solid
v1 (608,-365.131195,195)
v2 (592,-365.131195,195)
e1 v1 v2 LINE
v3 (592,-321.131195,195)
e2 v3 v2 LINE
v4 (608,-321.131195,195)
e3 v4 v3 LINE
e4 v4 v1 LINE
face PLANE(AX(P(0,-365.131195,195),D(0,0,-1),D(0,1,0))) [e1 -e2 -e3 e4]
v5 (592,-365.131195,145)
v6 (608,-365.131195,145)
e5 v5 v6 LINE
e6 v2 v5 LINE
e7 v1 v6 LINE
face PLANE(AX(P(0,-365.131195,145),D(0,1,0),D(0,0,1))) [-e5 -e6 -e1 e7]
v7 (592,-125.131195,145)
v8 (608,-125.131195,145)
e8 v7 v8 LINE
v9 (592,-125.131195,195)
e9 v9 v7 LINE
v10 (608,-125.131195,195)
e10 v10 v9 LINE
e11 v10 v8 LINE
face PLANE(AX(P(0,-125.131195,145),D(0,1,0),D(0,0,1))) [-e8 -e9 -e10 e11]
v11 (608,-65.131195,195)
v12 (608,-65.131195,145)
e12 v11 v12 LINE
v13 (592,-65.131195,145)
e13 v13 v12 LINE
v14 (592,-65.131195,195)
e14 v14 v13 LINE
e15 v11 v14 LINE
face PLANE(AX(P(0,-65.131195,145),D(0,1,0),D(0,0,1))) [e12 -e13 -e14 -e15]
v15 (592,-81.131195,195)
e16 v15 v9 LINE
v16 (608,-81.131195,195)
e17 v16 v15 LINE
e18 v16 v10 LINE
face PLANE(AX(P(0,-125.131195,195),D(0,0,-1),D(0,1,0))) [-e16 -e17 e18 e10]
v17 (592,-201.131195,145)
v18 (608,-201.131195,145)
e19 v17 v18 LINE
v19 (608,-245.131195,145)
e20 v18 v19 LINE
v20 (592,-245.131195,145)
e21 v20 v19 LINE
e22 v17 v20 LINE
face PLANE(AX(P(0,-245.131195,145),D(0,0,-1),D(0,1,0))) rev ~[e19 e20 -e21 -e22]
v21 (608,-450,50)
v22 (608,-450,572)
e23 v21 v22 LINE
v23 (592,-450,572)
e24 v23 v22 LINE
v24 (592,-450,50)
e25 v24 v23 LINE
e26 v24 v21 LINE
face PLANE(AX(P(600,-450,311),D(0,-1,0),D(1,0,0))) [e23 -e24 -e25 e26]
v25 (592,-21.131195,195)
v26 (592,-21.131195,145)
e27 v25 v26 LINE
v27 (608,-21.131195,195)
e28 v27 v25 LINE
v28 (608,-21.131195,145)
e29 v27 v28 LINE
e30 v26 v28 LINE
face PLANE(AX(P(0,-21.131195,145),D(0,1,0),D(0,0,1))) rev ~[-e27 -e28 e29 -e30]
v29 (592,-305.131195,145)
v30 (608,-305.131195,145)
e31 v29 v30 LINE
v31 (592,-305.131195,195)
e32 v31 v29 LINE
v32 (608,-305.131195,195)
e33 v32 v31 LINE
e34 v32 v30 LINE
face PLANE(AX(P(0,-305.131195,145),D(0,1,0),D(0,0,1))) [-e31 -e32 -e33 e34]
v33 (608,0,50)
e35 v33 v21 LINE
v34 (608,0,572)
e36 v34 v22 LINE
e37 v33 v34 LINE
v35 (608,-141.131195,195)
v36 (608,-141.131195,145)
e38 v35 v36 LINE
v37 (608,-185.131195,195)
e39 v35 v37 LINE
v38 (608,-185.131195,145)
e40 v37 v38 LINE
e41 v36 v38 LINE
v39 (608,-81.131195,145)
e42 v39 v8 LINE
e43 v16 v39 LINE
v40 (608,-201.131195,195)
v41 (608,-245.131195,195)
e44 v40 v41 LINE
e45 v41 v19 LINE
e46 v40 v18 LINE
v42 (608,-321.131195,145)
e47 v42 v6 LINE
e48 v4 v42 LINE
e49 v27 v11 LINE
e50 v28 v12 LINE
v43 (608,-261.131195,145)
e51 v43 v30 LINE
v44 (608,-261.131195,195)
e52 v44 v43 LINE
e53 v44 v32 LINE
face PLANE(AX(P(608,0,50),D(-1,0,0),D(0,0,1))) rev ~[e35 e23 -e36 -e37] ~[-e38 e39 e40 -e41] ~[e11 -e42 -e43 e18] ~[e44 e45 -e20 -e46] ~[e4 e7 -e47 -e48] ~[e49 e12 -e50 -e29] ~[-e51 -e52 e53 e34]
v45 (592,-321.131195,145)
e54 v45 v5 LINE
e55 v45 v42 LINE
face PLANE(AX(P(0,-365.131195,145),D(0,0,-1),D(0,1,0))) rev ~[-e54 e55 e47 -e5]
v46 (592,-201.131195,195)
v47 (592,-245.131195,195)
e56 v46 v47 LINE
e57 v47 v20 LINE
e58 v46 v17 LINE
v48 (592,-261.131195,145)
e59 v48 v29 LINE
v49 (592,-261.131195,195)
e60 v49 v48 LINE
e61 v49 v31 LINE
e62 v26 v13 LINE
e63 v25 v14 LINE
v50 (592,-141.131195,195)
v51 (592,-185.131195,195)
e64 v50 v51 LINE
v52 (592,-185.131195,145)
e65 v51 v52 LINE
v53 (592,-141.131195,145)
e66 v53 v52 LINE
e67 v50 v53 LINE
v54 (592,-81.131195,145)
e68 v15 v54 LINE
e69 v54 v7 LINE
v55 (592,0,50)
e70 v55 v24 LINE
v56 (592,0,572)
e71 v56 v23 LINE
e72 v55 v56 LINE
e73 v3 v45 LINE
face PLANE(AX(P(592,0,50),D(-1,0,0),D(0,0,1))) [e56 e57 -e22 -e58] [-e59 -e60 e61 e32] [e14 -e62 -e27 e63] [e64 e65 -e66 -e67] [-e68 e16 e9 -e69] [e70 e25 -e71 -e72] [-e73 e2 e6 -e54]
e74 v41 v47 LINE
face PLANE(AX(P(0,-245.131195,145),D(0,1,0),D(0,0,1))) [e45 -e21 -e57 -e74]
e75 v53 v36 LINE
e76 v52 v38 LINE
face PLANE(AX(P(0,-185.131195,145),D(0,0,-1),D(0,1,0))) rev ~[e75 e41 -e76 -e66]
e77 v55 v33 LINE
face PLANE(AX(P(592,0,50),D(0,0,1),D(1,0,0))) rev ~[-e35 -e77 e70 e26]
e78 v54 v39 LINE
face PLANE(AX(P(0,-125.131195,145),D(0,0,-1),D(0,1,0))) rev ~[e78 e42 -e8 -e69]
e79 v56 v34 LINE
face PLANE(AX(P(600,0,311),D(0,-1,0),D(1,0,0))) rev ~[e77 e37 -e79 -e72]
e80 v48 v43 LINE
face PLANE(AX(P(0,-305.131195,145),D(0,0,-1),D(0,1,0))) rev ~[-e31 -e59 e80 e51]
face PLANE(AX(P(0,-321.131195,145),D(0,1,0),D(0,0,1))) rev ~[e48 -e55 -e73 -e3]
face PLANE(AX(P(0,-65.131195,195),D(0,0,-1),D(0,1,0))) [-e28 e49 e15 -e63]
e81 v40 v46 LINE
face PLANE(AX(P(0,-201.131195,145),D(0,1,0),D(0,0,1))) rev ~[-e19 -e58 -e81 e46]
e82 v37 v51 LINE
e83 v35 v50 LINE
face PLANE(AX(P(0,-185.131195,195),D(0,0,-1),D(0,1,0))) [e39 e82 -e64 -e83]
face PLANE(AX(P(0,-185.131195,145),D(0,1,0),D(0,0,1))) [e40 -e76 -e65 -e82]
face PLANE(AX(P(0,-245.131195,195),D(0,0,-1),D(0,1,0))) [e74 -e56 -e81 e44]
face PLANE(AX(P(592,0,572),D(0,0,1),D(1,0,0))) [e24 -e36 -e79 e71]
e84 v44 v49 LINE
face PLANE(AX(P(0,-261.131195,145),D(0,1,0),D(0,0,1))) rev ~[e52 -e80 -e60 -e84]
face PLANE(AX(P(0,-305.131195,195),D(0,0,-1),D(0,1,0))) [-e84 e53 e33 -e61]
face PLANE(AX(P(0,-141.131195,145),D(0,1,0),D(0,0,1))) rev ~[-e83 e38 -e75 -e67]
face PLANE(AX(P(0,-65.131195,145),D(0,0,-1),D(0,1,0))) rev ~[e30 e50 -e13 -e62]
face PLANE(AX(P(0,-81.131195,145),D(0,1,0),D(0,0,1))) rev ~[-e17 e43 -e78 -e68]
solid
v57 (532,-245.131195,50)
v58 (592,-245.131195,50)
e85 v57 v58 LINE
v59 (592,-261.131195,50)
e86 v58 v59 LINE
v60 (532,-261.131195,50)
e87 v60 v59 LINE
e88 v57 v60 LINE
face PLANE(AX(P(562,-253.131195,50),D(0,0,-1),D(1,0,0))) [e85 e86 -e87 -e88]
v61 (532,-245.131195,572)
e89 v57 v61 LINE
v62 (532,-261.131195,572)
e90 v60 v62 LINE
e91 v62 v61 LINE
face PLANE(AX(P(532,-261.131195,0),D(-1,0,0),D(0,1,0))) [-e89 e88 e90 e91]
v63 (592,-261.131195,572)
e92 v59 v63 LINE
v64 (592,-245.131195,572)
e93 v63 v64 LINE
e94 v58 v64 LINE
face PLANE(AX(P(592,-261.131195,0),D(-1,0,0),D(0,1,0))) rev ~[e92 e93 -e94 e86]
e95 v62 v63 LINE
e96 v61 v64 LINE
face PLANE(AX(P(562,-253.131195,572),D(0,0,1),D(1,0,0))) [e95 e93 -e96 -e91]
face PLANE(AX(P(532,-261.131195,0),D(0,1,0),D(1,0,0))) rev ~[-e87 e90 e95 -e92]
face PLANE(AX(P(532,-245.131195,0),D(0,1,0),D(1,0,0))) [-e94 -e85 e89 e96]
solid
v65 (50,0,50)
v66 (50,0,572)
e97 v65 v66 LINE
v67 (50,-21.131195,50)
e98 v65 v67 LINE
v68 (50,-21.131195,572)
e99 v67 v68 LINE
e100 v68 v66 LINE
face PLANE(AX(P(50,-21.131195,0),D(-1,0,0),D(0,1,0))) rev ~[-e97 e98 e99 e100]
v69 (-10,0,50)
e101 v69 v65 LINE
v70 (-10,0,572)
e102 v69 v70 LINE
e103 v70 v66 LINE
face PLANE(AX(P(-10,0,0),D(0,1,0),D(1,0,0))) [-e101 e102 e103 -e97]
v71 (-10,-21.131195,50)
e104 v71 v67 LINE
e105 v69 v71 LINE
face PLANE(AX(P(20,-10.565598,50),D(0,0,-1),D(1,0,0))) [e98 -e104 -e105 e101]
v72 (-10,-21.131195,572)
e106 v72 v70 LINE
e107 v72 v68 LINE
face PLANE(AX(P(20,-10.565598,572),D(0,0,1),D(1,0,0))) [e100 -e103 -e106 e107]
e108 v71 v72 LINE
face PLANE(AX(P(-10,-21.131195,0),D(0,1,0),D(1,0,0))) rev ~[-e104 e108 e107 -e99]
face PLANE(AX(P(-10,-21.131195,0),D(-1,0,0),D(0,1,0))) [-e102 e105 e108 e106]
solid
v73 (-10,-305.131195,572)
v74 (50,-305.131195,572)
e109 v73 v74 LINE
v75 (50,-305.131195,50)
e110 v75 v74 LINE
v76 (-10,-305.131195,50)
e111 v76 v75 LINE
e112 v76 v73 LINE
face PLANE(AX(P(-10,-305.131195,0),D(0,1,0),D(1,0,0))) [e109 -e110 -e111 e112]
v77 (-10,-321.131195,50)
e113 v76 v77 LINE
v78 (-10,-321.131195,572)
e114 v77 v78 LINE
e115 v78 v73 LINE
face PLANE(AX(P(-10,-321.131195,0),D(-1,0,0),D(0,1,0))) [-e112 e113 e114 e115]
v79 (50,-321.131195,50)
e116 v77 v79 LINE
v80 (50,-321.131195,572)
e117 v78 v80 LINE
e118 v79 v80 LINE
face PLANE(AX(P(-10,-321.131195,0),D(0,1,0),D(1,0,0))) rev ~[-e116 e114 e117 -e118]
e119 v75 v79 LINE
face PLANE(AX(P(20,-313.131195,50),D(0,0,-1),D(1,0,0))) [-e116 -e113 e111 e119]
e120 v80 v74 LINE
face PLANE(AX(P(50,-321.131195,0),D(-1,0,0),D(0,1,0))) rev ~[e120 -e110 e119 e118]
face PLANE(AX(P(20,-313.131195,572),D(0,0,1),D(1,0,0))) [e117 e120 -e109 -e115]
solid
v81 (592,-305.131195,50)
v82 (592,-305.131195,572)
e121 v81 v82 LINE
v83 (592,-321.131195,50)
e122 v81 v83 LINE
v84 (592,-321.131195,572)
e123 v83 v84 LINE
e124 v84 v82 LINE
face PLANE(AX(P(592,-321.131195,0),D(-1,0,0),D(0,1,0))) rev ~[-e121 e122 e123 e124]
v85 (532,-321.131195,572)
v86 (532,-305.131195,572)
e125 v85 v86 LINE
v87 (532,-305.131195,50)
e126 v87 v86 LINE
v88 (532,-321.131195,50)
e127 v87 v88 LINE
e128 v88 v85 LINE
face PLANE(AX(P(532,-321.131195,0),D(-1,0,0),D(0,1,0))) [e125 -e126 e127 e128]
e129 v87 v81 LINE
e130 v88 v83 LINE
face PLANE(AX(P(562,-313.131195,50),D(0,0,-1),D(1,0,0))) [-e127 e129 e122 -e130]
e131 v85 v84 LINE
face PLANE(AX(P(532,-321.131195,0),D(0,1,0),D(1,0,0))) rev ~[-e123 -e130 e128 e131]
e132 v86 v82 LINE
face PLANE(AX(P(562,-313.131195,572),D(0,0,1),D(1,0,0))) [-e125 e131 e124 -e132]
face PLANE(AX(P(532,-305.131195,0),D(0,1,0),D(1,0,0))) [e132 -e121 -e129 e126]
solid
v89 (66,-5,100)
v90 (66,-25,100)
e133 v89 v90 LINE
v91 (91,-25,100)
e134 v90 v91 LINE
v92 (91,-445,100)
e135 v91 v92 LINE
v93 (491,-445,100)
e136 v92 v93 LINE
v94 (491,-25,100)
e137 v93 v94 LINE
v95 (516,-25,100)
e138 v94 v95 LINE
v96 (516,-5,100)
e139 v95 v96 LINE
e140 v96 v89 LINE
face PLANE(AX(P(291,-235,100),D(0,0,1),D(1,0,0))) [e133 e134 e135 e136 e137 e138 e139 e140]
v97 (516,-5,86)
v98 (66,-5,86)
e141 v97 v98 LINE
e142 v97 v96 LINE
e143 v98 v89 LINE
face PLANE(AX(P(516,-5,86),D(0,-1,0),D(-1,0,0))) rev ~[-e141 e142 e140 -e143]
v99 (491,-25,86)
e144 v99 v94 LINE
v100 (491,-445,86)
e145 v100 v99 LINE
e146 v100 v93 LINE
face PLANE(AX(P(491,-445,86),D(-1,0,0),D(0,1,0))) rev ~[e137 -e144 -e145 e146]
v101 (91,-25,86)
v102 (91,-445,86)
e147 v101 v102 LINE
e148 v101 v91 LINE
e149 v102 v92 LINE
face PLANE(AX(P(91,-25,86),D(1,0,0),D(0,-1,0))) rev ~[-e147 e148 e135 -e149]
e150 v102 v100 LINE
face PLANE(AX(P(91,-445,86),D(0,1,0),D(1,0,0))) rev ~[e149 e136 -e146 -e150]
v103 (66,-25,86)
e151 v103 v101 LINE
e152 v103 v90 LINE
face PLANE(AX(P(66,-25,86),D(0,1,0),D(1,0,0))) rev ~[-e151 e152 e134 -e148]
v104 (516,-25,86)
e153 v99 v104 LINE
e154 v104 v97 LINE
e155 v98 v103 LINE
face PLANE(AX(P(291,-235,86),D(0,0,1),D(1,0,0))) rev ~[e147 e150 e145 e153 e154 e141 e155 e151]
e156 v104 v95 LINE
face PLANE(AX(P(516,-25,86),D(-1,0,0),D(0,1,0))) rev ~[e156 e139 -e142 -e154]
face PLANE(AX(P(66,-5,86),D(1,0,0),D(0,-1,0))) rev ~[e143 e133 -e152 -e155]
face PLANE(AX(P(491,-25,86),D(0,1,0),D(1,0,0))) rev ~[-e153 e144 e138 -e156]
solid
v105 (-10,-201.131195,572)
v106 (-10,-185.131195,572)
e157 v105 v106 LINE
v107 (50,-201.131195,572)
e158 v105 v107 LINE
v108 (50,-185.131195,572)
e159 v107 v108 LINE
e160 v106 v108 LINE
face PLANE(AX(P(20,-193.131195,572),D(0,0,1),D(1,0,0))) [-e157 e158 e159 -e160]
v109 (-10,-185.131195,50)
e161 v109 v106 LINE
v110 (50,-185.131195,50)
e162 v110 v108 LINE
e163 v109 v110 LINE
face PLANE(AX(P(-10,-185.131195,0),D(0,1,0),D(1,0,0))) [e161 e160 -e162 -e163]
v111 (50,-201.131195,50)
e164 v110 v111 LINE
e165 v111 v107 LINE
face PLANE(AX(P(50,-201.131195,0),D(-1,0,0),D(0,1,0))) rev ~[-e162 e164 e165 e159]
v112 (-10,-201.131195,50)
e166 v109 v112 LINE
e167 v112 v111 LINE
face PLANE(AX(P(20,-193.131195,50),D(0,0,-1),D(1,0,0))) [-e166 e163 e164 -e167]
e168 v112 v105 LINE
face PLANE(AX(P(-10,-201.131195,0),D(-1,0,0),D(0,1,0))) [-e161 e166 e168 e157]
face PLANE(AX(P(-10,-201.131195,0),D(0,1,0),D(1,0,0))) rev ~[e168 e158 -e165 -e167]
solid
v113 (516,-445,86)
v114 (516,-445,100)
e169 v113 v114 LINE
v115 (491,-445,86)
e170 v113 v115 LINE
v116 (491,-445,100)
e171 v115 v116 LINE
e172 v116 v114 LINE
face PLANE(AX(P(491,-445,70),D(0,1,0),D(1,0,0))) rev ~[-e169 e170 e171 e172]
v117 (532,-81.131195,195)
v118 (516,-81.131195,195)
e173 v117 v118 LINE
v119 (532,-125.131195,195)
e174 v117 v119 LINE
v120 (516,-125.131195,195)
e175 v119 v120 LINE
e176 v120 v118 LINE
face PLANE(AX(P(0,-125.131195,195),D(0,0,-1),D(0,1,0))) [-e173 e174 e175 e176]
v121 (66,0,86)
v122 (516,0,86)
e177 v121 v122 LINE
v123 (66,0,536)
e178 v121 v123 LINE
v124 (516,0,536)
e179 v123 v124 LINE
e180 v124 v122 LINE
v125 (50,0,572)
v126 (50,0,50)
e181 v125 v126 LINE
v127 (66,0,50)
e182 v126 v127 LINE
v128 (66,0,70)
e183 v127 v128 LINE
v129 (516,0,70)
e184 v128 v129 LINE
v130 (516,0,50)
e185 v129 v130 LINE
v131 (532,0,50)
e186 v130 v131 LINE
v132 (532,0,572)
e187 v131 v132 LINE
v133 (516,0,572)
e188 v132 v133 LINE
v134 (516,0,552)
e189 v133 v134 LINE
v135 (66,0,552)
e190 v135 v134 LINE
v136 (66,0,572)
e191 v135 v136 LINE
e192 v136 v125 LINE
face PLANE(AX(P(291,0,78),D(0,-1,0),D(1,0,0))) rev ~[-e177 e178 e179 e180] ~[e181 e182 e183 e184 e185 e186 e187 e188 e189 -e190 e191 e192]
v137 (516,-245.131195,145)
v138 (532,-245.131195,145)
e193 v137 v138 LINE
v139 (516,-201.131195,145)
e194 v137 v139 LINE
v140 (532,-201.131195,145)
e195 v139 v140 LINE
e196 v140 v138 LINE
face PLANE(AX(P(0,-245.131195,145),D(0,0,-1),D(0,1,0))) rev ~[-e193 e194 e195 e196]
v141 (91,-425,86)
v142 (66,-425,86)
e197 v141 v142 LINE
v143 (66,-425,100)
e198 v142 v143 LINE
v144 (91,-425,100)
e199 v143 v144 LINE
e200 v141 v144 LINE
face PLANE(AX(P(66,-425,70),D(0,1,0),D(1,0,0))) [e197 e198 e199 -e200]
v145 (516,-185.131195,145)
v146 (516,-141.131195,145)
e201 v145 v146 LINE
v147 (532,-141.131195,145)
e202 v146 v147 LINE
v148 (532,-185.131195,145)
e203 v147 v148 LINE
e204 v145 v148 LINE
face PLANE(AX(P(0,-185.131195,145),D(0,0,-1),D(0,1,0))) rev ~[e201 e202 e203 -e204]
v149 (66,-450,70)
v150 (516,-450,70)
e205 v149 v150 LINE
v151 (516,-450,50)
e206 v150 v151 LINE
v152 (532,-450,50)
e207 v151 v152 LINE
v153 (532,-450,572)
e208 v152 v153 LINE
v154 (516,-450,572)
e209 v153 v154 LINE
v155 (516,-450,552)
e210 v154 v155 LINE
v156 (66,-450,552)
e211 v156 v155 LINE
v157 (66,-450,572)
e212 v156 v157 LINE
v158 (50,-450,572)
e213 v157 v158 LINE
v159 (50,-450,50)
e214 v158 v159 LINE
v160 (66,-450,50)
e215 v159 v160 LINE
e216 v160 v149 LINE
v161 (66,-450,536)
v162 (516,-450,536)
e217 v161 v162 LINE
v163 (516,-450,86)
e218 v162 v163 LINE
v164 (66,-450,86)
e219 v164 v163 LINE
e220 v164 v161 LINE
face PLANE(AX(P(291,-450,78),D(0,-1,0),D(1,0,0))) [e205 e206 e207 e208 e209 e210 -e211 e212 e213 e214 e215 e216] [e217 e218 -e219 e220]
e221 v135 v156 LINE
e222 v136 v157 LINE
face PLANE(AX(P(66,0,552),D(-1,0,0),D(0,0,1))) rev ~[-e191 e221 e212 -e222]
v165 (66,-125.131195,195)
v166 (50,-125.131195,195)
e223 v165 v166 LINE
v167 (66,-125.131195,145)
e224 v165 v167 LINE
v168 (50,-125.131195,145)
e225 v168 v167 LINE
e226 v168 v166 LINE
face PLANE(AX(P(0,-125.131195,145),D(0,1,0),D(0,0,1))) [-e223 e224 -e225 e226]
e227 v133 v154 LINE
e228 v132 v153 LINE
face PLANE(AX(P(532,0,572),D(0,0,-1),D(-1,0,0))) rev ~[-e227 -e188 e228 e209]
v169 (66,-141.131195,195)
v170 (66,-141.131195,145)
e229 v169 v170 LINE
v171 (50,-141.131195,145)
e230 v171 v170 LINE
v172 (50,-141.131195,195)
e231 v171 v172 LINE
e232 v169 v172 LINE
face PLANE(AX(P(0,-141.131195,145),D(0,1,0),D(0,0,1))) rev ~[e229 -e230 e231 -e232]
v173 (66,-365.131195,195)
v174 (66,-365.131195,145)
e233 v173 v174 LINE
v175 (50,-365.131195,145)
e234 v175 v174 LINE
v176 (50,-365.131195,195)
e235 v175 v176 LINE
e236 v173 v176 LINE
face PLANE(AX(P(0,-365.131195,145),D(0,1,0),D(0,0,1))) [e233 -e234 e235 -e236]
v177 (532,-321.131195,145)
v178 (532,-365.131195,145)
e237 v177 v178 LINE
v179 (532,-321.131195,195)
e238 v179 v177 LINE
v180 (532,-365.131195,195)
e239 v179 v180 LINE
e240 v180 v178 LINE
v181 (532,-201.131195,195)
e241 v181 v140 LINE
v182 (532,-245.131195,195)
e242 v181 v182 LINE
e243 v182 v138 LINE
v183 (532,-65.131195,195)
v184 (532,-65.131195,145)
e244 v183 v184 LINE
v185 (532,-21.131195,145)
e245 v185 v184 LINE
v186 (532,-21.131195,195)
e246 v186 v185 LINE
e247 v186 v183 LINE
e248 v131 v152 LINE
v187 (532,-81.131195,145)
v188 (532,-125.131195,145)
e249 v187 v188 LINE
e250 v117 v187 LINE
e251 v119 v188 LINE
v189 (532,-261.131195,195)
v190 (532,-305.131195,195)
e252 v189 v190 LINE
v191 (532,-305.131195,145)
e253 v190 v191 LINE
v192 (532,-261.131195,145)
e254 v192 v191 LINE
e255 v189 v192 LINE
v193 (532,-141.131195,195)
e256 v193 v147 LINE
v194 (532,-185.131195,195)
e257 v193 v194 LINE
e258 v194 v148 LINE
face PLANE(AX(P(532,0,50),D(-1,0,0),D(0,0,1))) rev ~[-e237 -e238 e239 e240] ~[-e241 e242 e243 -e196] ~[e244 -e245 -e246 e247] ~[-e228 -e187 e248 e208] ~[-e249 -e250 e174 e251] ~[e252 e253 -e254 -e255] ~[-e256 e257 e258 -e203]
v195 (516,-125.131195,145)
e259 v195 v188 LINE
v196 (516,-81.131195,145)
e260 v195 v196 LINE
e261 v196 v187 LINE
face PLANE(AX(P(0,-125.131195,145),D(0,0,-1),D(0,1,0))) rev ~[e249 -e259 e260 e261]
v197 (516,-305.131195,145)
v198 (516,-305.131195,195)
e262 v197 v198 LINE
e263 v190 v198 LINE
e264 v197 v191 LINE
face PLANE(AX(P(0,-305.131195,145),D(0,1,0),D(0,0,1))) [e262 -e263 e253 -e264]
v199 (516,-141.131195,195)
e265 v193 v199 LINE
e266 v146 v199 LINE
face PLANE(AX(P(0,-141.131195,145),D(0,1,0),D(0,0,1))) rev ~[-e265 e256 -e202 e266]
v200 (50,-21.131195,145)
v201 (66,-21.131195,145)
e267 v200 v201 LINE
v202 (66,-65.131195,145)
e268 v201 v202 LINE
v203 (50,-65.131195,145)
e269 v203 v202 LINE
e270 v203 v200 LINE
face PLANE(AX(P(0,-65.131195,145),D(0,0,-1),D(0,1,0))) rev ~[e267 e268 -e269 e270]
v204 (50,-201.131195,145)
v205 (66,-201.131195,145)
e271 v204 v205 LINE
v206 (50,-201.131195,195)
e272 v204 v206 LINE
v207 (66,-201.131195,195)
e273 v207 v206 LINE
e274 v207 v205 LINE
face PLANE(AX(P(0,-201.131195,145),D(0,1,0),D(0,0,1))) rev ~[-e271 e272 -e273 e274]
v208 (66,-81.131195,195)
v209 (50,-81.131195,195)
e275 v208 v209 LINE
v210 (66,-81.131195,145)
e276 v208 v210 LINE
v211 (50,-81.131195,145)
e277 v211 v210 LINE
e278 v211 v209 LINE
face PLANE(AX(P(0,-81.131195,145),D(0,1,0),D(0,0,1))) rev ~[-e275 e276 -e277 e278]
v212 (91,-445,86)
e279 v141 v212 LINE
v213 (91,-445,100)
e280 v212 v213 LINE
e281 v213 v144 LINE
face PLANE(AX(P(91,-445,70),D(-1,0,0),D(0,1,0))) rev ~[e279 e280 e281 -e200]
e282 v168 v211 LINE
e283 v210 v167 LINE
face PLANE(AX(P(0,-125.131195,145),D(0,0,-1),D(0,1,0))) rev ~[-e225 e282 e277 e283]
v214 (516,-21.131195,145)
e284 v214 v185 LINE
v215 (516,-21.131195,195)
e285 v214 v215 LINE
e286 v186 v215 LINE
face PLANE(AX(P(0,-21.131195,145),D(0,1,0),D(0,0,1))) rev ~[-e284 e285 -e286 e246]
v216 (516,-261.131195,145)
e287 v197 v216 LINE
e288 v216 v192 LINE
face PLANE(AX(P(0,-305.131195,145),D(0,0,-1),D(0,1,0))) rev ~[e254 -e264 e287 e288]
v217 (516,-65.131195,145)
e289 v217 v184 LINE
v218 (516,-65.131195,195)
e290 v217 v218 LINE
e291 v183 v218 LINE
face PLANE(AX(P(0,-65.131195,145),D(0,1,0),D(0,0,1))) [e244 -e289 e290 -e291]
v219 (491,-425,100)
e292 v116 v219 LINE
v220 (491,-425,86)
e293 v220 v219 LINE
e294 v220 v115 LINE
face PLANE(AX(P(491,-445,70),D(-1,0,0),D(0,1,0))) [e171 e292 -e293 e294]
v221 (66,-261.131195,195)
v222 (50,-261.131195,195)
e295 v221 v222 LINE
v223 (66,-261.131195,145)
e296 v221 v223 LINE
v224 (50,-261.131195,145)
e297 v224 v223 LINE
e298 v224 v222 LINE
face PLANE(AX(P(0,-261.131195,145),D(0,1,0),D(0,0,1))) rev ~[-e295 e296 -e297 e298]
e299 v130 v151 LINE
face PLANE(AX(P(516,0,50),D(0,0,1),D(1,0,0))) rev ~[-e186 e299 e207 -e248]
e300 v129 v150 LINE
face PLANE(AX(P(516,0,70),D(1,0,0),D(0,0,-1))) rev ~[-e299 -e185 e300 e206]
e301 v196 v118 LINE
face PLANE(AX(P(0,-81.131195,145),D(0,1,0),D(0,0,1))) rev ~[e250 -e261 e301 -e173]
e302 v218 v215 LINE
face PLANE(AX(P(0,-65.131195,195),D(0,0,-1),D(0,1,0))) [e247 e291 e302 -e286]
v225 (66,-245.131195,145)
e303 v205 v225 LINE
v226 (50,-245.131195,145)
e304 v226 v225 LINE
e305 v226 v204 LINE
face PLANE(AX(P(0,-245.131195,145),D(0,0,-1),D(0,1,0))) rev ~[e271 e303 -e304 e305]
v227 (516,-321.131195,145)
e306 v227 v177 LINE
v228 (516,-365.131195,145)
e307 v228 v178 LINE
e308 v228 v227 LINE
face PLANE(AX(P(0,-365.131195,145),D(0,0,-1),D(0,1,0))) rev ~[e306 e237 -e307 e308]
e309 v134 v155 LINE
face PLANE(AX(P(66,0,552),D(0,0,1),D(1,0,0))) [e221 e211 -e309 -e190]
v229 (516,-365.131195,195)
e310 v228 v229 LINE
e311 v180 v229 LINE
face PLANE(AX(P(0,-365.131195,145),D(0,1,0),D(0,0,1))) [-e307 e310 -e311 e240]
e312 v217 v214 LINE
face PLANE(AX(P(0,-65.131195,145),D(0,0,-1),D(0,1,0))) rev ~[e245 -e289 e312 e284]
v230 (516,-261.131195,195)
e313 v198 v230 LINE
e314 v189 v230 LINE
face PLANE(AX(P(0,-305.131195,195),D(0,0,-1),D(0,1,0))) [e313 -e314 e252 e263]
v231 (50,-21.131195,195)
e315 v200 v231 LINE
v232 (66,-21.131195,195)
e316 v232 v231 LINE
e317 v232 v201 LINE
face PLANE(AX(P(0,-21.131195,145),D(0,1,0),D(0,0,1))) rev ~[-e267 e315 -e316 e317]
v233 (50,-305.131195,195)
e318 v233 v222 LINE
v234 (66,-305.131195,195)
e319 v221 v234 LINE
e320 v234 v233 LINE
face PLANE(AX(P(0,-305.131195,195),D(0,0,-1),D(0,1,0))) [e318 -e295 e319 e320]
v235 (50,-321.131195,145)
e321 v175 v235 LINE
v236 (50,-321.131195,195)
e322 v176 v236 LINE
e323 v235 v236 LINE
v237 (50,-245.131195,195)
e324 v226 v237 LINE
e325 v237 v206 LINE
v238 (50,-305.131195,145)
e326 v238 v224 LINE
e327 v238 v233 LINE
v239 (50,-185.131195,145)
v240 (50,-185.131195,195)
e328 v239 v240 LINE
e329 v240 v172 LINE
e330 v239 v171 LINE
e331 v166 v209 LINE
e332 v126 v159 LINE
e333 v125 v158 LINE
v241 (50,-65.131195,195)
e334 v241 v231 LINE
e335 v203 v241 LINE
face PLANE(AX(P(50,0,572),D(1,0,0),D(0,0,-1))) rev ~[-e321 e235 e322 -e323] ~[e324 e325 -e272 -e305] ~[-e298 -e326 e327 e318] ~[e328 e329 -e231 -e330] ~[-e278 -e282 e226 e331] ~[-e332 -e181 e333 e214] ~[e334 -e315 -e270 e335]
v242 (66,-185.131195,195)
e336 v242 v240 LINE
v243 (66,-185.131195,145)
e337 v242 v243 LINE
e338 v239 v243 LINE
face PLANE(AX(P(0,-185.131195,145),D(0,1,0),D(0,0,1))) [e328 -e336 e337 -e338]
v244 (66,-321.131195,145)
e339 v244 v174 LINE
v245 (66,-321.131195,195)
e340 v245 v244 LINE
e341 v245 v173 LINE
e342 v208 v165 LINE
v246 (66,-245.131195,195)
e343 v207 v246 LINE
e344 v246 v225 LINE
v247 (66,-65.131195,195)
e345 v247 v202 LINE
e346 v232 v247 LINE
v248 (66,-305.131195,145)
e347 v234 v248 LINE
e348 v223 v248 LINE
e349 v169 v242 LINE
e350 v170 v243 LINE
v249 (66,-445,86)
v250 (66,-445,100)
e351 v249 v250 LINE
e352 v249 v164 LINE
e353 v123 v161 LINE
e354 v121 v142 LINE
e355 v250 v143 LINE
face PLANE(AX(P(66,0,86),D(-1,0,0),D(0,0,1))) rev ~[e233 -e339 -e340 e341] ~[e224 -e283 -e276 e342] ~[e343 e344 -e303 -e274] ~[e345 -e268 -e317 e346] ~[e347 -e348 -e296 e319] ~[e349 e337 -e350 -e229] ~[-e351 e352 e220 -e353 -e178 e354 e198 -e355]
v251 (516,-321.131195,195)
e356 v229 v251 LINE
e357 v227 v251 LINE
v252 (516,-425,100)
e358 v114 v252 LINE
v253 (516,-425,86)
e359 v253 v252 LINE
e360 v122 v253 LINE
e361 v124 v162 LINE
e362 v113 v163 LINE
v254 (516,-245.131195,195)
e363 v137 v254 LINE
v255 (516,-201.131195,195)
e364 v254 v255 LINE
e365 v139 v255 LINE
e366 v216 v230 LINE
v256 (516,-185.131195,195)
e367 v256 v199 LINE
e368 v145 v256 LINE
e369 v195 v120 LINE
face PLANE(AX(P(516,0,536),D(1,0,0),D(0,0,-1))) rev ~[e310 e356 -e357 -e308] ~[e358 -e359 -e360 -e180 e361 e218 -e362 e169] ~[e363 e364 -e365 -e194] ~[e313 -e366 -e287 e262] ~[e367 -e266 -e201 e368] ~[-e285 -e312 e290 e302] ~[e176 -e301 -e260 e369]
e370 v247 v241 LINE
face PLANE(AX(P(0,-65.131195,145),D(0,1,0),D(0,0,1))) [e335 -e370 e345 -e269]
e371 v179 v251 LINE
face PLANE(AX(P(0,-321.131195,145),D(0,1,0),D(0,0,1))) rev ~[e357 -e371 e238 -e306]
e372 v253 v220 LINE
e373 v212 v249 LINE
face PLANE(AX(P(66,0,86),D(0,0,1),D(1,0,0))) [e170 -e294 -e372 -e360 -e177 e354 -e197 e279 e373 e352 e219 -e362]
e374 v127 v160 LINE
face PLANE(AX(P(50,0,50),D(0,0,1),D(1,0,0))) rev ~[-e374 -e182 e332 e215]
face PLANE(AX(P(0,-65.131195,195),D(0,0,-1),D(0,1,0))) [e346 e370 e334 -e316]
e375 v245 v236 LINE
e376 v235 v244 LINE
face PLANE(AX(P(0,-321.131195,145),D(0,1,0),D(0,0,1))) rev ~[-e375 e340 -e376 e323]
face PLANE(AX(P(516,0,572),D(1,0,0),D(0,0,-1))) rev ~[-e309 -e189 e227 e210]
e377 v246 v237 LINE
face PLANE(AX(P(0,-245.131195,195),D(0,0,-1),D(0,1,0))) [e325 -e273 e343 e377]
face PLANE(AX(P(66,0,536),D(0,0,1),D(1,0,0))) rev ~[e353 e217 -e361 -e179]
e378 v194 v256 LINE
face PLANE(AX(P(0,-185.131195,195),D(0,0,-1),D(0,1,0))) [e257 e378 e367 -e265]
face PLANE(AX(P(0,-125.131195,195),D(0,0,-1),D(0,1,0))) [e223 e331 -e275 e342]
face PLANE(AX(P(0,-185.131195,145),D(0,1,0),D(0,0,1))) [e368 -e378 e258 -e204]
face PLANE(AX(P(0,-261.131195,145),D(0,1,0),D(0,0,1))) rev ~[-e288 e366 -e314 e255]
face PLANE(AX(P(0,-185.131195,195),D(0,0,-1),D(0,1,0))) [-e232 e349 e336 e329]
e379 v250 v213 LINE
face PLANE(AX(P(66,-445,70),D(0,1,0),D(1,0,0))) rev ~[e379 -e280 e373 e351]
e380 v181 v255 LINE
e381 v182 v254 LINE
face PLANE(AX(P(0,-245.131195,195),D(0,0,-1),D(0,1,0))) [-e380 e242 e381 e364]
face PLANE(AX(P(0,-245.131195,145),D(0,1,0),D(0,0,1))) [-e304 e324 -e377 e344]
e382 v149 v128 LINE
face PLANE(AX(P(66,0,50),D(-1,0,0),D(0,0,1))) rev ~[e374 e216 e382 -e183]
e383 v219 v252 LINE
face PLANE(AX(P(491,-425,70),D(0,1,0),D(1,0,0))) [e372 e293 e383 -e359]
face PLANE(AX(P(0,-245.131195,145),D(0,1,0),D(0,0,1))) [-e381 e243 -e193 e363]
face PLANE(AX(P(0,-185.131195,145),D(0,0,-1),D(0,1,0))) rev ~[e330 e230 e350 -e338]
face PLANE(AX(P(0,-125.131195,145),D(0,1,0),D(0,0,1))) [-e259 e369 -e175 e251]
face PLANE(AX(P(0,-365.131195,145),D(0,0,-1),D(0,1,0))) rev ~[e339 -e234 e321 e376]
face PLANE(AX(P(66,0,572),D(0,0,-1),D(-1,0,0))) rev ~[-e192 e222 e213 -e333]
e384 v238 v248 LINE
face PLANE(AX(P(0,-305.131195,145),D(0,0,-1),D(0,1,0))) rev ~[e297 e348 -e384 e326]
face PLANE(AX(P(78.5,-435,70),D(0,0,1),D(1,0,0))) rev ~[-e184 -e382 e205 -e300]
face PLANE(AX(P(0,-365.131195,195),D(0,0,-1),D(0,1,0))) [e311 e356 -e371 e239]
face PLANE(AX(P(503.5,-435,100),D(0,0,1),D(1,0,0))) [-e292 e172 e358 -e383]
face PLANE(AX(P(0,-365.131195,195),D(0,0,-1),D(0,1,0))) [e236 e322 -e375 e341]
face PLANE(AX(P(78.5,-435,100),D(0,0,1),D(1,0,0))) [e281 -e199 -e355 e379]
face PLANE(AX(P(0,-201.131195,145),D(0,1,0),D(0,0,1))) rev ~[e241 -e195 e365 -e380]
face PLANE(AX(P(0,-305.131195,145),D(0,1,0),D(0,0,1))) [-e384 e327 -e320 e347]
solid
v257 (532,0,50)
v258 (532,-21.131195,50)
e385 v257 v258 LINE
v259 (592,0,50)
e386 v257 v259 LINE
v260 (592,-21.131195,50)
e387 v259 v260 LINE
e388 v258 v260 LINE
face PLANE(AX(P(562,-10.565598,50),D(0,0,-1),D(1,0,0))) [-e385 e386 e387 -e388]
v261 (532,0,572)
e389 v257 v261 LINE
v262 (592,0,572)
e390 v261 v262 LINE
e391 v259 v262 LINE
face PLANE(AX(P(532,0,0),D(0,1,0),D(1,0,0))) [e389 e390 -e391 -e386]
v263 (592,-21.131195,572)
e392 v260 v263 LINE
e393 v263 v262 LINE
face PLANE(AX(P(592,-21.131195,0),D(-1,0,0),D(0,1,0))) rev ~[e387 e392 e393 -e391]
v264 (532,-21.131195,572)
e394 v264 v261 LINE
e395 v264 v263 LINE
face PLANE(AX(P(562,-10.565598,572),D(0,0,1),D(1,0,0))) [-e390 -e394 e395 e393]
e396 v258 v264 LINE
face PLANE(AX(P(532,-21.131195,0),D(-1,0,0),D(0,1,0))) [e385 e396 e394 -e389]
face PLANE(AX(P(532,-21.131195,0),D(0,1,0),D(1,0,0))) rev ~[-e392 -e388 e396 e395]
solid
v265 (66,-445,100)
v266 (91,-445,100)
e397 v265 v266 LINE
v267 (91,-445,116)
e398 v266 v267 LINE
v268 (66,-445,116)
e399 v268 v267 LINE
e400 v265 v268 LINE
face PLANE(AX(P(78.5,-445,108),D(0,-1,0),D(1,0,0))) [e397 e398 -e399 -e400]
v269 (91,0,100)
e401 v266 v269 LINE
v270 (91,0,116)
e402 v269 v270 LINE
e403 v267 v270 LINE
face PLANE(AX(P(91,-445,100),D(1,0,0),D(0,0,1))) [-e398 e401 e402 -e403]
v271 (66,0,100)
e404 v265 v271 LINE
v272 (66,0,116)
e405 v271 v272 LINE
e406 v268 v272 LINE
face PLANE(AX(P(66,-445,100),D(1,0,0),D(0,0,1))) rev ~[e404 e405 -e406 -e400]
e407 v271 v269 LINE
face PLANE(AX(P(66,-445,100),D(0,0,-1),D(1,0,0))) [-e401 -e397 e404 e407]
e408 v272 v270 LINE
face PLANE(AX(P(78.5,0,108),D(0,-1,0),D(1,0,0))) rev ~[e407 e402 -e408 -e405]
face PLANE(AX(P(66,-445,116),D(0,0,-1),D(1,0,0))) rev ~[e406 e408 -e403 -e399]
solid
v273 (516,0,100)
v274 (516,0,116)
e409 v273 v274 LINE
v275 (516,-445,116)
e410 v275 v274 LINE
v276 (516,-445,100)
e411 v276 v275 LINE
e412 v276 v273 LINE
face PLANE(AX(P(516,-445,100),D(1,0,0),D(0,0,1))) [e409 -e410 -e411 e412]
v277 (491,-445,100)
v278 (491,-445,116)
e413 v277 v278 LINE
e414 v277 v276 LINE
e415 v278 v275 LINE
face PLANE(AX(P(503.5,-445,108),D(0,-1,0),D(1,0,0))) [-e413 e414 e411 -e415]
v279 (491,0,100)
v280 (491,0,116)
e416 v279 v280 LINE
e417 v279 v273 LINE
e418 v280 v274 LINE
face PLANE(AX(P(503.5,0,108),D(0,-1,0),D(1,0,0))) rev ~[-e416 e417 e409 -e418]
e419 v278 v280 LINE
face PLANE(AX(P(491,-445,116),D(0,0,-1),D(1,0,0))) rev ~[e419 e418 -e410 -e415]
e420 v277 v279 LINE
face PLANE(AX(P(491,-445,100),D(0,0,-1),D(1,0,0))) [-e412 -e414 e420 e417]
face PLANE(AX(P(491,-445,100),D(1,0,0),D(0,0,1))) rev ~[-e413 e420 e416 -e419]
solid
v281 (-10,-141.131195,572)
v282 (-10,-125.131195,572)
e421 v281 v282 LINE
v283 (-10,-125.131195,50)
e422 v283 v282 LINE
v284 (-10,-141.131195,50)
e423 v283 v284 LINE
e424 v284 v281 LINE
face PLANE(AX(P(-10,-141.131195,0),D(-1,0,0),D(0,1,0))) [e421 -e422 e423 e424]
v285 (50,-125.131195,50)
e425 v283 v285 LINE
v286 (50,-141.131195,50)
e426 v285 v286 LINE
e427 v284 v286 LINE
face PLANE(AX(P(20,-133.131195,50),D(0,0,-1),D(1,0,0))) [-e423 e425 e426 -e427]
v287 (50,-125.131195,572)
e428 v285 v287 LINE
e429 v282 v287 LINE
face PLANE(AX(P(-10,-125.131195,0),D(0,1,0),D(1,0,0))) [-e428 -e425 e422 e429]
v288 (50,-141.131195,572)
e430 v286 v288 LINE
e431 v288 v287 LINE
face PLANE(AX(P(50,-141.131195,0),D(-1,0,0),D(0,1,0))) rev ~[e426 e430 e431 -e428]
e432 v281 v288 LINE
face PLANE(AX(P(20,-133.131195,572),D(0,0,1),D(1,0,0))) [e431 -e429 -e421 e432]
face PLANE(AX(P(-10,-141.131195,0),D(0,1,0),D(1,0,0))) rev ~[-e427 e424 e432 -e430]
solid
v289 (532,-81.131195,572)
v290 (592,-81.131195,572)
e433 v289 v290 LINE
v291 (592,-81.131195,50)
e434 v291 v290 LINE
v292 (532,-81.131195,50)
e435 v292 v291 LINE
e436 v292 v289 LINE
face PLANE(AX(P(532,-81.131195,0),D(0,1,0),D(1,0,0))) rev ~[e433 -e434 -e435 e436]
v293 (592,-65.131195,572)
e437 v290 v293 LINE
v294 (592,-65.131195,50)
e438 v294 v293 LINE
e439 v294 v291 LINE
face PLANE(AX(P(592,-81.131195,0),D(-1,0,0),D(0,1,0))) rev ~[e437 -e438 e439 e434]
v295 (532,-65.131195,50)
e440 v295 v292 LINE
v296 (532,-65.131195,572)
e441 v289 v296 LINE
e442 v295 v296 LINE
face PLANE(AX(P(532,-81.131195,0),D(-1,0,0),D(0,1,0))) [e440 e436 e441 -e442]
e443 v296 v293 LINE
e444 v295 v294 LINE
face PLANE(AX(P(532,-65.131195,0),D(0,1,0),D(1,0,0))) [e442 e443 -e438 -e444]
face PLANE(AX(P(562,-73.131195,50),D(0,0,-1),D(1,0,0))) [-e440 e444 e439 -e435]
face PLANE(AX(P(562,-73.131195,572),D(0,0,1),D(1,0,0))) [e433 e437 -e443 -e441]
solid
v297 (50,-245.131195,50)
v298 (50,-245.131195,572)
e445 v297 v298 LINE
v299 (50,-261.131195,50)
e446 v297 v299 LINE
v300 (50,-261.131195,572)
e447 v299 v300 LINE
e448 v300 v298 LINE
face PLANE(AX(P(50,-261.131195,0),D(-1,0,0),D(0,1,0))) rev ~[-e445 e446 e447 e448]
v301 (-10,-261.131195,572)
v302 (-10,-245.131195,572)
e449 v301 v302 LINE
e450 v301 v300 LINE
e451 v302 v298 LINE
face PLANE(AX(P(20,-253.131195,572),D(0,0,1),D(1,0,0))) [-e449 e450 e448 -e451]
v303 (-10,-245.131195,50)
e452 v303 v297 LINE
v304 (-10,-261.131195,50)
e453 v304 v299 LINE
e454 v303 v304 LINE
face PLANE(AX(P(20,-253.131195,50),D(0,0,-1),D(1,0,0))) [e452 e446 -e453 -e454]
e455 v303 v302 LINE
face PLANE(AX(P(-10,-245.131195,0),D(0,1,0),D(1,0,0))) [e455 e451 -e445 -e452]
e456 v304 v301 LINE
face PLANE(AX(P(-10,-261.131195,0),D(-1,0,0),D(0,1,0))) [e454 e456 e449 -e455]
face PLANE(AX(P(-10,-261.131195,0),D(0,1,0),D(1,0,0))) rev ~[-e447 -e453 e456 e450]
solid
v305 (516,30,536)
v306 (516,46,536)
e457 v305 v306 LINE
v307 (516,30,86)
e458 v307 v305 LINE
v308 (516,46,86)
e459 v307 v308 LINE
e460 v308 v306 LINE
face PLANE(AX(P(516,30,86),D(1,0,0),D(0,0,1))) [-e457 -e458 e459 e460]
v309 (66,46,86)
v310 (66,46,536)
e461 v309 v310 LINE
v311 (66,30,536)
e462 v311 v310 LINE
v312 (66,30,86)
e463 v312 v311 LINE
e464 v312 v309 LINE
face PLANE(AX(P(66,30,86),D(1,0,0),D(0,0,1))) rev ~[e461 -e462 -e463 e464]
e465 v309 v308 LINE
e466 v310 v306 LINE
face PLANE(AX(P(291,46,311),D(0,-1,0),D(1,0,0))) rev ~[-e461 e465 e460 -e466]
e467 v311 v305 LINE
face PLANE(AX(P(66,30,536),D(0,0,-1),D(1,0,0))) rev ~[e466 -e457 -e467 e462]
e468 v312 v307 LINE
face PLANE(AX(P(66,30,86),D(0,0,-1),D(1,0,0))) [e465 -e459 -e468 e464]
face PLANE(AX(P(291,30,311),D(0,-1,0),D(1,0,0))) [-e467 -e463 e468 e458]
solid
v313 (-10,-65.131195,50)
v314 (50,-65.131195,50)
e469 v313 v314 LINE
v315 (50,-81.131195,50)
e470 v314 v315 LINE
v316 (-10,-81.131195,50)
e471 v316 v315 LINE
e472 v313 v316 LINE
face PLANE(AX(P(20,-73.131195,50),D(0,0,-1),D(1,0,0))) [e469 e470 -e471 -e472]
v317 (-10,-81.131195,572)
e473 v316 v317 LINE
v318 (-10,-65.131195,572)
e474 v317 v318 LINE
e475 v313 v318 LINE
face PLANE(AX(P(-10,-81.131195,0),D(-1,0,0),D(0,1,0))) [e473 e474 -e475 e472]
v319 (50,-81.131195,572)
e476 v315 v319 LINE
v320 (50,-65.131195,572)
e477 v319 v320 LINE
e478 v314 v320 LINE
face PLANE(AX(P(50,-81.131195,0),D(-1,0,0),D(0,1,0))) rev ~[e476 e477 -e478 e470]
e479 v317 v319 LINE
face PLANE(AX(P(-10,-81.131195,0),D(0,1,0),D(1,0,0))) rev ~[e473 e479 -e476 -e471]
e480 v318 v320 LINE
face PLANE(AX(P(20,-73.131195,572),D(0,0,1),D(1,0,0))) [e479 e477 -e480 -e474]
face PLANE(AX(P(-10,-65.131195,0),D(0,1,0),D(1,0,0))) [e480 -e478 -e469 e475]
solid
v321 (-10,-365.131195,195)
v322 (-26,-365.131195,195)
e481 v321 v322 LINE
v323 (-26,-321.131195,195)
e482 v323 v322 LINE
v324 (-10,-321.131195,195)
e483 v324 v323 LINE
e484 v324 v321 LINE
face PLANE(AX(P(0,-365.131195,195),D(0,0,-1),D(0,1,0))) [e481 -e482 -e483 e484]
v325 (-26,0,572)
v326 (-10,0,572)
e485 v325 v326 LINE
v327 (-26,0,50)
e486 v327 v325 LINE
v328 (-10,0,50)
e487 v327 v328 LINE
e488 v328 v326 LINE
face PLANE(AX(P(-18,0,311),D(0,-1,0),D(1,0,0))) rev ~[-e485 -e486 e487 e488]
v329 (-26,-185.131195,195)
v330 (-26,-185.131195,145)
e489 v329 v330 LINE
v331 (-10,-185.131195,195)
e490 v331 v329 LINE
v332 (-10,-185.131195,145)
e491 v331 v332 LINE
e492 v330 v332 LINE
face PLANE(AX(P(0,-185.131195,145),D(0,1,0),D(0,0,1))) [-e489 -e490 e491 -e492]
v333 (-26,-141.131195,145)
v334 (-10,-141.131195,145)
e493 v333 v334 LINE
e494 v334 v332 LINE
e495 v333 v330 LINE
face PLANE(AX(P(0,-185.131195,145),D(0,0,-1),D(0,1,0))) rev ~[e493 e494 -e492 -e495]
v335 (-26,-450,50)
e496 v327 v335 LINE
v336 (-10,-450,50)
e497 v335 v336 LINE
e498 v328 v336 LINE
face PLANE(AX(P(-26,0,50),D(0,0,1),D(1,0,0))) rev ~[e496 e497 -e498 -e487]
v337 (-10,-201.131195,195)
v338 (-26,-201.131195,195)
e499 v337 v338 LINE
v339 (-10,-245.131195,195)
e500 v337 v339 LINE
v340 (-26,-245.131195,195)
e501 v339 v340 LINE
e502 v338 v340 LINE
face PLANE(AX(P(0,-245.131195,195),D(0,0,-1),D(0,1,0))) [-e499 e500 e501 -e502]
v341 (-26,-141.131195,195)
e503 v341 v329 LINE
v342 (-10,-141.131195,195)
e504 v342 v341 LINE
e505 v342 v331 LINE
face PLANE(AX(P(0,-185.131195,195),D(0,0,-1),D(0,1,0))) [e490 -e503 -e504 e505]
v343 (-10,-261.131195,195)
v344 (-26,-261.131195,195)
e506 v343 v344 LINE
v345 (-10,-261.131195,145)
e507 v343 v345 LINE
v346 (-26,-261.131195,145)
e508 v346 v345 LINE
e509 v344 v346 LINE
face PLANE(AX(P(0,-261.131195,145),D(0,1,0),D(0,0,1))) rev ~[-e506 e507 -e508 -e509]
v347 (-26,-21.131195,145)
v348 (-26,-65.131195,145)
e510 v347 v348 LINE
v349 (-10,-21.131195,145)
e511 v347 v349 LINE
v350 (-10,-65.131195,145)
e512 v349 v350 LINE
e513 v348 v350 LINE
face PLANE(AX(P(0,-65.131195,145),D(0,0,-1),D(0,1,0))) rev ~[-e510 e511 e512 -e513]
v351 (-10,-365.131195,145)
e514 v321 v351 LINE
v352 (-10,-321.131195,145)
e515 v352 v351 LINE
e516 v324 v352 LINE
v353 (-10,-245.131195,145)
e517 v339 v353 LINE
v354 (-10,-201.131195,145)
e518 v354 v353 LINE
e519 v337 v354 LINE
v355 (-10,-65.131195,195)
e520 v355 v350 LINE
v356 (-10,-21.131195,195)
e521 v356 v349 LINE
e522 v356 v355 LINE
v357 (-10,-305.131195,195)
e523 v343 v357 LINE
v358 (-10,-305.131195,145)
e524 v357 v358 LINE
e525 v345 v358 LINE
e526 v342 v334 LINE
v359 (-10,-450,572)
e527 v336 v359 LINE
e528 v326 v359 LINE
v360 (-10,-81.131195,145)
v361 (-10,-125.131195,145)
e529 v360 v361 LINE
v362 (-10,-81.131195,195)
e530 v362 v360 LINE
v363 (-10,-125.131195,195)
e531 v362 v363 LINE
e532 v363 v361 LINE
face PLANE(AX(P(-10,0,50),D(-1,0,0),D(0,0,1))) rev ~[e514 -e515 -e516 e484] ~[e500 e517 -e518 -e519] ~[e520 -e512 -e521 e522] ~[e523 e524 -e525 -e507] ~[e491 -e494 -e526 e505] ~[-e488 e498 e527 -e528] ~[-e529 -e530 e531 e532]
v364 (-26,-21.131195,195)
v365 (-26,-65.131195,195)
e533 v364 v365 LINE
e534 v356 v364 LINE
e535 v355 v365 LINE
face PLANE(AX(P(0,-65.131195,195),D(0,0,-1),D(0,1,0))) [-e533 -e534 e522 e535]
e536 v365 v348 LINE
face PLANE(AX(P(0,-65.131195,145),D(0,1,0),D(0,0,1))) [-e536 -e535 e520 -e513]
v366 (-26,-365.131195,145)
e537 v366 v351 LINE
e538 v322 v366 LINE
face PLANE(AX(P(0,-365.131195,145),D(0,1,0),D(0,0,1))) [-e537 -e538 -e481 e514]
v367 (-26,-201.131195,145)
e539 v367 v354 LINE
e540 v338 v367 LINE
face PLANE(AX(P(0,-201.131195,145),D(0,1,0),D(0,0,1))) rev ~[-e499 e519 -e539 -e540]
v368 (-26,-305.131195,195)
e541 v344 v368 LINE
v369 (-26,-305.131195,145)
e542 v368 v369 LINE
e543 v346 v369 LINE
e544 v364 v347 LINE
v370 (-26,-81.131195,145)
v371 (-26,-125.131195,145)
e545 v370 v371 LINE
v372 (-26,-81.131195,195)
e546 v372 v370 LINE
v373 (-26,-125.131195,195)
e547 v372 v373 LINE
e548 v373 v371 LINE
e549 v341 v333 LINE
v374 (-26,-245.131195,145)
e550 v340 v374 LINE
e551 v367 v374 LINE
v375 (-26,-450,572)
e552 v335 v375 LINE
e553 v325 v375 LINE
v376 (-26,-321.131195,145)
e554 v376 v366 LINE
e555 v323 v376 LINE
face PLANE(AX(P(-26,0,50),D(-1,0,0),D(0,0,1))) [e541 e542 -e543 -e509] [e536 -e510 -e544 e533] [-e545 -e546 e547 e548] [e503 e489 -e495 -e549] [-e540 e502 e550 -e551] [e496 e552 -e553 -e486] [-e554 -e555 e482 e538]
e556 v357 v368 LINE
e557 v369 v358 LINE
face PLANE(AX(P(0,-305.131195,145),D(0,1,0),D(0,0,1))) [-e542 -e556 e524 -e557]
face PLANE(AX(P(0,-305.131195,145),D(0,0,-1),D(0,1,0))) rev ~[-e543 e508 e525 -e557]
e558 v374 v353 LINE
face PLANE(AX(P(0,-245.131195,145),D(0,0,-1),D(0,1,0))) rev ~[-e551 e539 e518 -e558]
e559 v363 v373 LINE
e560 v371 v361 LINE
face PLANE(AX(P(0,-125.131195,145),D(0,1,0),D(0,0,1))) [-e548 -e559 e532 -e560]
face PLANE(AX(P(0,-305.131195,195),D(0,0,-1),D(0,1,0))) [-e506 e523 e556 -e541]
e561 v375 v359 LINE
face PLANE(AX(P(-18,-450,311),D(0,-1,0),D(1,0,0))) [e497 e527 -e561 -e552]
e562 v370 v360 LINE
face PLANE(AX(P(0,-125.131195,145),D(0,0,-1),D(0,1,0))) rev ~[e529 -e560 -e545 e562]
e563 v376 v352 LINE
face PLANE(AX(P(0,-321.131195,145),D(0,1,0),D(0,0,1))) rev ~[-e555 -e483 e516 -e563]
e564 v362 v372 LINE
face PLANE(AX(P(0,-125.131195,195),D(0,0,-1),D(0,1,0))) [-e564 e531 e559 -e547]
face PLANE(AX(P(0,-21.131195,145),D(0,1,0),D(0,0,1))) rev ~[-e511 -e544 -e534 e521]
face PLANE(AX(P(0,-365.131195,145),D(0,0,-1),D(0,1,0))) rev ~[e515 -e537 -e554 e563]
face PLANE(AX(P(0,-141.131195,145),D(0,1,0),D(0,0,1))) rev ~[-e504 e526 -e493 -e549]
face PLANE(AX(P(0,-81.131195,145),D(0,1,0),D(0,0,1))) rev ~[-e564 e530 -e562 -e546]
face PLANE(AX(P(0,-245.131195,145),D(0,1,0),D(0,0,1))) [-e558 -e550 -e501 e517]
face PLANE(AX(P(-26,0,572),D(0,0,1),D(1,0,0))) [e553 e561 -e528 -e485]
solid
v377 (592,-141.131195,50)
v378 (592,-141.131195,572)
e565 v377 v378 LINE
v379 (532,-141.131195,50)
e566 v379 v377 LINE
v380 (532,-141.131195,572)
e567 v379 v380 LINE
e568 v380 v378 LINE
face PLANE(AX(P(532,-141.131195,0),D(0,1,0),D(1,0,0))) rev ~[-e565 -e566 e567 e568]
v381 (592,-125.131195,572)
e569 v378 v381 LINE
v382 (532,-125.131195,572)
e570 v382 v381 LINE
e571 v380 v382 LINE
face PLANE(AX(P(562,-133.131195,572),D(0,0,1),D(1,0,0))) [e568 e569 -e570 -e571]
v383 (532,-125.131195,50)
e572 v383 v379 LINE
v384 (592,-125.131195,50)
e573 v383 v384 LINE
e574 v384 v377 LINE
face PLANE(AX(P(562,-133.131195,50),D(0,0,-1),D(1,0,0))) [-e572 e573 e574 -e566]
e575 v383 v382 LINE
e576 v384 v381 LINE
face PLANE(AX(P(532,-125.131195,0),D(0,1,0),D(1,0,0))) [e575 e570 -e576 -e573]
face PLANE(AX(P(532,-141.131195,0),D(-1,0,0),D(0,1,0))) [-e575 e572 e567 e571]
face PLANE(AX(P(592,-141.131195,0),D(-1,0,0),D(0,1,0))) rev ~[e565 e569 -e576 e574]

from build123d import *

# Parameters (mm, degrees)
F1_W          = 450
F1_H          = 16
F3_DEPTH      = 450
F1_W_2        = 16
F1_H_2        = 522
F4_W          = 44
F4_H          = 50
F5_DEPTH      = 1209
F5_DEPTH_BACK = 175
F6_W          = 60
F6_H          = 21.131195128
F7_DEPTH      = 572
F6_H_2        = 16
F7_FACE_W     = 60
F7_FACE_H     = 21.131195128
F7_FACE_H_2   = 16
F8_DEPTH      = 50
F9_START      = -30
F1_H_3        = 450
F9_DEPTH      = 16
F11_START     = 86
F11_DEPTH     = 14
F12_START     = 70
F10_W         = 25
F10_H         = 20
F12_DEPTH     = 30
F13_W         = 25
F13_H         = 16
F14_DEPTH     = 445


with BuildPart() as f3:
    # F1 (on Front) → F3 (new body, through all)
    with BuildSketch(Plane.XZ):
        with Locations((291, 78)):
            Rectangle(F1_W, F1_H)
        Polygon((516, 86), (516, 70), (516, 50), (532, 50), (532, 572), (516, 572), (516, 552), (516, 536), align=None)
        with Locations((291, 544)):
            Rectangle(F1_W, F1_H)
        Polygon((50, 572), (50, 50), (66, 50), (66, 70), (66, 86), (66, 536), (66, 552), (66, 572), align=None)
    extrude(amount=F3_DEPTH)


with BuildPart() as f3b:
    # F1 (on Front) → F3, piece 2 (new body, through all)
    with BuildSketch(Plane.XZ):
        with Locations((600, 311)):
            Rectangle(F1_W_2, F1_H_2)
    extrude(amount=F3_DEPTH)


with BuildPart() as f3c:
    # F1 (on Front) → F3, piece 3 (new body, through all)
    with BuildSketch(Plane.XZ):
        with Locations((-18, 311)):
            Rectangle(F1_W_2, F1_H_2)
    extrude(amount=F3_DEPTH)


with BuildPart() as f5_tool:
    # F4 (on Right) → F5 (new body, two sides)
    with BuildSketch(Plane.YZ) as f5_sk:
        with Locations((-43.131195128, 170)):
            Rectangle(F4_W, F4_H)
        with Locations((-103.131195128, 170)):
            Rectangle(F4_W, F4_H)
        with Locations((-163.131195128, 170)):
            Rectangle(F4_W, F4_H)
        with Locations((-223.131195128, 170)):
            Rectangle(F4_W, F4_H)
        with Locations((-283.131195128, 170)):
            Rectangle(F4_W, F4_H)
        with Locations((-343.131195128, 170)):
            Rectangle(F4_W, F4_H)
    extrude(amount=F5_DEPTH)
    extrude(f5_sk.sketch, amount=-F5_DEPTH_BACK)


with BuildPart() as f3_1:
    add(f3.part)

    # F5: cut by f5_tool
    add(f5_tool.part, mode=Mode.SUBTRACT)

    # F10 (on Top) → F12 (join)
    with BuildSketch(Plane.XY.offset(F12_START)):
        with Locations((78.5, -435)):
            Rectangle(F10_W, F10_H)
        with Locations((503.5, -435)):
            Rectangle(F10_W, F10_H)
    extrude(amount=F12_DEPTH)


with BuildPart() as f3b_1:
    add(f3b.part)

    # F5: cut by f5_tool
    add(f5_tool.part, mode=Mode.SUBTRACT)


with BuildPart() as f3c_1:
    add(f3c.part)

    # F5: cut by f5_tool
    add(f5_tool.part, mode=Mode.SUBTRACT)


with BuildPart() as f7:
    # F6 (on Top) → F7 (new body, through all)
    with BuildSketch(Plane.XY):
        with Locations((20, -10.565597564)):
            Rectangle(F6_W, F6_H)
    extrude(amount=F7_DEPTH)


with BuildPart() as f7b:
    # F6 (on Top) → F7, piece 2 (new body, through all)
    with BuildSketch(Plane.XY):
        with Locations((20, -73.131195128)):
            Rectangle(F6_W, F6_H_2)
    extrude(amount=F7_DEPTH)


with BuildPart() as f7c:
    # F6 (on Top) → F7, piece 3 (new body, through all)
    with BuildSketch(Plane.XY):
        with Locations((20, -133.131195128)):
            Rectangle(F6_W, F6_H_2)
    extrude(amount=F7_DEPTH)


with BuildPart() as f7d:
    # F6 (on Top) → F7, piece 4 (new body, through all)
    with BuildSketch(Plane.XY):
        with Locations((20, -193.131195128)):
            Rectangle(F6_W, F6_H_2)
    extrude(amount=F7_DEPTH)


with BuildPart() as f7e:
    # F6 (on Top) → F7, piece 5 (new body, through all)
    with BuildSketch(Plane.XY):
        with Locations((20, -253.131195128)):
            Rectangle(F6_W, F6_H_2)
    extrude(amount=F7_DEPTH)


with BuildPart() as f7f:
    # F6 (on Top) → F7, piece 6 (new body, through all)
    with BuildSketch(Plane.XY):
        with Locations((20, -313.131195128)):
            Rectangle(F6_W, F6_H_2)
    extrude(amount=F7_DEPTH)


with BuildPart() as f7g:
    # F6 (on Top) → F7, piece 7 (new body, through all)
    with BuildSketch(Plane.XY):
        with Locations((562, -313.131195128)):
            Rectangle(F6_W, F6_H_2)
    extrude(amount=F7_DEPTH)


with BuildPart() as f7h:
    # F6 (on Top) → F7, piece 8 (new body, through all)
    with BuildSketch(Plane.XY):
        with Locations((562, -253.131195128)):
            Rectangle(F6_W, F6_H_2)
    extrude(amount=F7_DEPTH)


with BuildPart() as f7i:
    # F6 (on Top) → F7, piece 9 (new body, through all)
    with BuildSketch(Plane.XY):
        with Locations((562, -133.131195128)):
            Rectangle(F6_W, F6_H_2)
    extrude(amount=F7_DEPTH)


with BuildPart() as f7j:
    # F6 (on Top) → F7, piece 10 (new body, through all)
    with BuildSketch(Plane.XY):
        with Locations((562, -73.131195128)):
            Rectangle(F6_W, F6_H_2)
    extrude(amount=F7_DEPTH)


with BuildPart() as f7k:
    # F6 (on Top) → F7, piece 11 (new body, through all)
    with BuildSketch(Plane.XY):
        with Locations((562, -10.565597564)):
            Rectangle(F6_W, F6_H)
    extrude(amount=F7_DEPTH)


with BuildPart() as f8_tool:
    # F7_face (on face) → F8 (new body, through all)
    with BuildSketch(Plane(origin=(20, -10.565597564, 0), x_dir=(1, 0, 0), z_dir=(0, 0, -1))):
        Rectangle(F7_FACE_W, F7_FACE_H)
        with Locations((0, 62.565597564)):
            Rectangle(F7_FACE_W, F7_FACE_H_2)
        with Locations((0, 122.565597564)):
            Rectangle(F7_FACE_W, F7_FACE_H_2)
        with Locations((0, 182.565597564)):
            Rectangle(F7_FACE_W, F7_FACE_H_2)
        with Locations((0, 242.565597564)):
            Rectangle(F7_FACE_W, F7_FACE_H_2)
        with Locations((0, 302.565597564)):
            Rectangle(F7_FACE_W, F7_FACE_H_2)
        with Locations((542, 0)):
            Rectangle(F7_FACE_W, F7_FACE_H)
        with Locations((542, 62.565597564)):
            Rectangle(F7_FACE_W, F7_FACE_H_2)
        with Locations((542, 122.565597564)):
            Rectangle(F7_FACE_W, F7_FACE_H_2)
        with Locations((542, 242.565597564)):
            Rectangle(F7_FACE_W, F7_FACE_H_2)
        with Locations((542, 302.565597564)):
            Rectangle(F7_FACE_W, F7_FACE_H_2)
    extrude(amount=-F8_DEPTH)


with BuildPart() as f7_1:
    add(f7.part)

    # F8: cut by f8_tool
    add(f8_tool.part, mode=Mode.SUBTRACT)


with BuildPart() as f7b_1:
    add(f7b.part)

    # F8: cut by f8_tool
    add(f8_tool.part, mode=Mode.SUBTRACT)


with BuildPart() as f7c_1:
    add(f7c.part)

    # F8: cut by f8_tool
    add(f8_tool.part, mode=Mode.SUBTRACT)


with BuildPart() as f7d_1:
    add(f7d.part)

    # F8: cut by f8_tool
    add(f8_tool.part, mode=Mode.SUBTRACT)


with BuildPart() as f7e_1:
    add(f7e.part)

    # F8: cut by f8_tool
    add(f8_tool.part, mode=Mode.SUBTRACT)


with BuildPart() as f7f_1:
    add(f7f.part)

    # F8: cut by f8_tool
    add(f8_tool.part, mode=Mode.SUBTRACT)


with BuildPart() as f7g_1:
    add(f7g.part)

    # F8: cut by f8_tool
    add(f8_tool.part, mode=Mode.SUBTRACT)


with BuildPart() as f7h_1:
    add(f7h.part)

    # F8: cut by f8_tool
    add(f8_tool.part, mode=Mode.SUBTRACT)


with BuildPart() as f7i_1:
    add(f7i.part)

    # F8: cut by f8_tool
    add(f8_tool.part, mode=Mode.SUBTRACT)


with BuildPart() as f7j_1:
    add(f7j.part)

    # F8: cut by f8_tool
    add(f8_tool.part, mode=Mode.SUBTRACT)


with BuildPart() as f7k_1:
    add(f7k.part)

    # F8: cut by f8_tool
    add(f8_tool.part, mode=Mode.SUBTRACT)


with BuildPart() as f9:
    # F1 (on Front) → F9 (new body)
    with BuildSketch(Plane.XZ.offset(F9_START)):
        with Locations((291, 311)):
            Rectangle(F1_W, F1_H_3)
    extrude(amount=-F9_DEPTH)


with BuildPart() as f11:
    # F10 (on Top) → F11 (new body)
    with BuildSketch(Plane.XY.offset(F11_START)):
        Polygon((491, -25), (91, -25), (91, -425), (91, -445), (491, -445), (491, -425), align=None)
        Polygon((66, -5), (66, -25), (91, -25), (491, -25), (516, -25), (516, -5), align=None)
    extrude(amount=F11_DEPTH)


with BuildPart() as f14:
    # F13 (on face) → F14 (new body, through all)
    with BuildSketch(Plane.XZ.offset(445)):
        with Locations((78.5, 108)):
            Rectangle(F13_W, F13_H)
    extrude(amount=-F14_DEPTH)


with BuildPart() as f14b:
    # F13 (on face) → F14, piece 2 (new body, through all)
    with BuildSketch(Plane.XZ.offset(445)):
        with Locations((503.5, 108)):
            Rectangle(F13_W, F13_H)
    extrude(amount=-F14_DEPTH)


solid = Compound([f3_1.part, f3b_1.part, f3c_1.part, f7_1.part, f7b_1.part, f7c_1.part, f7d_1.part, f7e_1.part, f7f_1.part, f7g_1.part, f7h_1.part, f7i_1.part, f7j_1.part, f7k_1.part, f9.part, f11.part, f14.part, f14b.part])
